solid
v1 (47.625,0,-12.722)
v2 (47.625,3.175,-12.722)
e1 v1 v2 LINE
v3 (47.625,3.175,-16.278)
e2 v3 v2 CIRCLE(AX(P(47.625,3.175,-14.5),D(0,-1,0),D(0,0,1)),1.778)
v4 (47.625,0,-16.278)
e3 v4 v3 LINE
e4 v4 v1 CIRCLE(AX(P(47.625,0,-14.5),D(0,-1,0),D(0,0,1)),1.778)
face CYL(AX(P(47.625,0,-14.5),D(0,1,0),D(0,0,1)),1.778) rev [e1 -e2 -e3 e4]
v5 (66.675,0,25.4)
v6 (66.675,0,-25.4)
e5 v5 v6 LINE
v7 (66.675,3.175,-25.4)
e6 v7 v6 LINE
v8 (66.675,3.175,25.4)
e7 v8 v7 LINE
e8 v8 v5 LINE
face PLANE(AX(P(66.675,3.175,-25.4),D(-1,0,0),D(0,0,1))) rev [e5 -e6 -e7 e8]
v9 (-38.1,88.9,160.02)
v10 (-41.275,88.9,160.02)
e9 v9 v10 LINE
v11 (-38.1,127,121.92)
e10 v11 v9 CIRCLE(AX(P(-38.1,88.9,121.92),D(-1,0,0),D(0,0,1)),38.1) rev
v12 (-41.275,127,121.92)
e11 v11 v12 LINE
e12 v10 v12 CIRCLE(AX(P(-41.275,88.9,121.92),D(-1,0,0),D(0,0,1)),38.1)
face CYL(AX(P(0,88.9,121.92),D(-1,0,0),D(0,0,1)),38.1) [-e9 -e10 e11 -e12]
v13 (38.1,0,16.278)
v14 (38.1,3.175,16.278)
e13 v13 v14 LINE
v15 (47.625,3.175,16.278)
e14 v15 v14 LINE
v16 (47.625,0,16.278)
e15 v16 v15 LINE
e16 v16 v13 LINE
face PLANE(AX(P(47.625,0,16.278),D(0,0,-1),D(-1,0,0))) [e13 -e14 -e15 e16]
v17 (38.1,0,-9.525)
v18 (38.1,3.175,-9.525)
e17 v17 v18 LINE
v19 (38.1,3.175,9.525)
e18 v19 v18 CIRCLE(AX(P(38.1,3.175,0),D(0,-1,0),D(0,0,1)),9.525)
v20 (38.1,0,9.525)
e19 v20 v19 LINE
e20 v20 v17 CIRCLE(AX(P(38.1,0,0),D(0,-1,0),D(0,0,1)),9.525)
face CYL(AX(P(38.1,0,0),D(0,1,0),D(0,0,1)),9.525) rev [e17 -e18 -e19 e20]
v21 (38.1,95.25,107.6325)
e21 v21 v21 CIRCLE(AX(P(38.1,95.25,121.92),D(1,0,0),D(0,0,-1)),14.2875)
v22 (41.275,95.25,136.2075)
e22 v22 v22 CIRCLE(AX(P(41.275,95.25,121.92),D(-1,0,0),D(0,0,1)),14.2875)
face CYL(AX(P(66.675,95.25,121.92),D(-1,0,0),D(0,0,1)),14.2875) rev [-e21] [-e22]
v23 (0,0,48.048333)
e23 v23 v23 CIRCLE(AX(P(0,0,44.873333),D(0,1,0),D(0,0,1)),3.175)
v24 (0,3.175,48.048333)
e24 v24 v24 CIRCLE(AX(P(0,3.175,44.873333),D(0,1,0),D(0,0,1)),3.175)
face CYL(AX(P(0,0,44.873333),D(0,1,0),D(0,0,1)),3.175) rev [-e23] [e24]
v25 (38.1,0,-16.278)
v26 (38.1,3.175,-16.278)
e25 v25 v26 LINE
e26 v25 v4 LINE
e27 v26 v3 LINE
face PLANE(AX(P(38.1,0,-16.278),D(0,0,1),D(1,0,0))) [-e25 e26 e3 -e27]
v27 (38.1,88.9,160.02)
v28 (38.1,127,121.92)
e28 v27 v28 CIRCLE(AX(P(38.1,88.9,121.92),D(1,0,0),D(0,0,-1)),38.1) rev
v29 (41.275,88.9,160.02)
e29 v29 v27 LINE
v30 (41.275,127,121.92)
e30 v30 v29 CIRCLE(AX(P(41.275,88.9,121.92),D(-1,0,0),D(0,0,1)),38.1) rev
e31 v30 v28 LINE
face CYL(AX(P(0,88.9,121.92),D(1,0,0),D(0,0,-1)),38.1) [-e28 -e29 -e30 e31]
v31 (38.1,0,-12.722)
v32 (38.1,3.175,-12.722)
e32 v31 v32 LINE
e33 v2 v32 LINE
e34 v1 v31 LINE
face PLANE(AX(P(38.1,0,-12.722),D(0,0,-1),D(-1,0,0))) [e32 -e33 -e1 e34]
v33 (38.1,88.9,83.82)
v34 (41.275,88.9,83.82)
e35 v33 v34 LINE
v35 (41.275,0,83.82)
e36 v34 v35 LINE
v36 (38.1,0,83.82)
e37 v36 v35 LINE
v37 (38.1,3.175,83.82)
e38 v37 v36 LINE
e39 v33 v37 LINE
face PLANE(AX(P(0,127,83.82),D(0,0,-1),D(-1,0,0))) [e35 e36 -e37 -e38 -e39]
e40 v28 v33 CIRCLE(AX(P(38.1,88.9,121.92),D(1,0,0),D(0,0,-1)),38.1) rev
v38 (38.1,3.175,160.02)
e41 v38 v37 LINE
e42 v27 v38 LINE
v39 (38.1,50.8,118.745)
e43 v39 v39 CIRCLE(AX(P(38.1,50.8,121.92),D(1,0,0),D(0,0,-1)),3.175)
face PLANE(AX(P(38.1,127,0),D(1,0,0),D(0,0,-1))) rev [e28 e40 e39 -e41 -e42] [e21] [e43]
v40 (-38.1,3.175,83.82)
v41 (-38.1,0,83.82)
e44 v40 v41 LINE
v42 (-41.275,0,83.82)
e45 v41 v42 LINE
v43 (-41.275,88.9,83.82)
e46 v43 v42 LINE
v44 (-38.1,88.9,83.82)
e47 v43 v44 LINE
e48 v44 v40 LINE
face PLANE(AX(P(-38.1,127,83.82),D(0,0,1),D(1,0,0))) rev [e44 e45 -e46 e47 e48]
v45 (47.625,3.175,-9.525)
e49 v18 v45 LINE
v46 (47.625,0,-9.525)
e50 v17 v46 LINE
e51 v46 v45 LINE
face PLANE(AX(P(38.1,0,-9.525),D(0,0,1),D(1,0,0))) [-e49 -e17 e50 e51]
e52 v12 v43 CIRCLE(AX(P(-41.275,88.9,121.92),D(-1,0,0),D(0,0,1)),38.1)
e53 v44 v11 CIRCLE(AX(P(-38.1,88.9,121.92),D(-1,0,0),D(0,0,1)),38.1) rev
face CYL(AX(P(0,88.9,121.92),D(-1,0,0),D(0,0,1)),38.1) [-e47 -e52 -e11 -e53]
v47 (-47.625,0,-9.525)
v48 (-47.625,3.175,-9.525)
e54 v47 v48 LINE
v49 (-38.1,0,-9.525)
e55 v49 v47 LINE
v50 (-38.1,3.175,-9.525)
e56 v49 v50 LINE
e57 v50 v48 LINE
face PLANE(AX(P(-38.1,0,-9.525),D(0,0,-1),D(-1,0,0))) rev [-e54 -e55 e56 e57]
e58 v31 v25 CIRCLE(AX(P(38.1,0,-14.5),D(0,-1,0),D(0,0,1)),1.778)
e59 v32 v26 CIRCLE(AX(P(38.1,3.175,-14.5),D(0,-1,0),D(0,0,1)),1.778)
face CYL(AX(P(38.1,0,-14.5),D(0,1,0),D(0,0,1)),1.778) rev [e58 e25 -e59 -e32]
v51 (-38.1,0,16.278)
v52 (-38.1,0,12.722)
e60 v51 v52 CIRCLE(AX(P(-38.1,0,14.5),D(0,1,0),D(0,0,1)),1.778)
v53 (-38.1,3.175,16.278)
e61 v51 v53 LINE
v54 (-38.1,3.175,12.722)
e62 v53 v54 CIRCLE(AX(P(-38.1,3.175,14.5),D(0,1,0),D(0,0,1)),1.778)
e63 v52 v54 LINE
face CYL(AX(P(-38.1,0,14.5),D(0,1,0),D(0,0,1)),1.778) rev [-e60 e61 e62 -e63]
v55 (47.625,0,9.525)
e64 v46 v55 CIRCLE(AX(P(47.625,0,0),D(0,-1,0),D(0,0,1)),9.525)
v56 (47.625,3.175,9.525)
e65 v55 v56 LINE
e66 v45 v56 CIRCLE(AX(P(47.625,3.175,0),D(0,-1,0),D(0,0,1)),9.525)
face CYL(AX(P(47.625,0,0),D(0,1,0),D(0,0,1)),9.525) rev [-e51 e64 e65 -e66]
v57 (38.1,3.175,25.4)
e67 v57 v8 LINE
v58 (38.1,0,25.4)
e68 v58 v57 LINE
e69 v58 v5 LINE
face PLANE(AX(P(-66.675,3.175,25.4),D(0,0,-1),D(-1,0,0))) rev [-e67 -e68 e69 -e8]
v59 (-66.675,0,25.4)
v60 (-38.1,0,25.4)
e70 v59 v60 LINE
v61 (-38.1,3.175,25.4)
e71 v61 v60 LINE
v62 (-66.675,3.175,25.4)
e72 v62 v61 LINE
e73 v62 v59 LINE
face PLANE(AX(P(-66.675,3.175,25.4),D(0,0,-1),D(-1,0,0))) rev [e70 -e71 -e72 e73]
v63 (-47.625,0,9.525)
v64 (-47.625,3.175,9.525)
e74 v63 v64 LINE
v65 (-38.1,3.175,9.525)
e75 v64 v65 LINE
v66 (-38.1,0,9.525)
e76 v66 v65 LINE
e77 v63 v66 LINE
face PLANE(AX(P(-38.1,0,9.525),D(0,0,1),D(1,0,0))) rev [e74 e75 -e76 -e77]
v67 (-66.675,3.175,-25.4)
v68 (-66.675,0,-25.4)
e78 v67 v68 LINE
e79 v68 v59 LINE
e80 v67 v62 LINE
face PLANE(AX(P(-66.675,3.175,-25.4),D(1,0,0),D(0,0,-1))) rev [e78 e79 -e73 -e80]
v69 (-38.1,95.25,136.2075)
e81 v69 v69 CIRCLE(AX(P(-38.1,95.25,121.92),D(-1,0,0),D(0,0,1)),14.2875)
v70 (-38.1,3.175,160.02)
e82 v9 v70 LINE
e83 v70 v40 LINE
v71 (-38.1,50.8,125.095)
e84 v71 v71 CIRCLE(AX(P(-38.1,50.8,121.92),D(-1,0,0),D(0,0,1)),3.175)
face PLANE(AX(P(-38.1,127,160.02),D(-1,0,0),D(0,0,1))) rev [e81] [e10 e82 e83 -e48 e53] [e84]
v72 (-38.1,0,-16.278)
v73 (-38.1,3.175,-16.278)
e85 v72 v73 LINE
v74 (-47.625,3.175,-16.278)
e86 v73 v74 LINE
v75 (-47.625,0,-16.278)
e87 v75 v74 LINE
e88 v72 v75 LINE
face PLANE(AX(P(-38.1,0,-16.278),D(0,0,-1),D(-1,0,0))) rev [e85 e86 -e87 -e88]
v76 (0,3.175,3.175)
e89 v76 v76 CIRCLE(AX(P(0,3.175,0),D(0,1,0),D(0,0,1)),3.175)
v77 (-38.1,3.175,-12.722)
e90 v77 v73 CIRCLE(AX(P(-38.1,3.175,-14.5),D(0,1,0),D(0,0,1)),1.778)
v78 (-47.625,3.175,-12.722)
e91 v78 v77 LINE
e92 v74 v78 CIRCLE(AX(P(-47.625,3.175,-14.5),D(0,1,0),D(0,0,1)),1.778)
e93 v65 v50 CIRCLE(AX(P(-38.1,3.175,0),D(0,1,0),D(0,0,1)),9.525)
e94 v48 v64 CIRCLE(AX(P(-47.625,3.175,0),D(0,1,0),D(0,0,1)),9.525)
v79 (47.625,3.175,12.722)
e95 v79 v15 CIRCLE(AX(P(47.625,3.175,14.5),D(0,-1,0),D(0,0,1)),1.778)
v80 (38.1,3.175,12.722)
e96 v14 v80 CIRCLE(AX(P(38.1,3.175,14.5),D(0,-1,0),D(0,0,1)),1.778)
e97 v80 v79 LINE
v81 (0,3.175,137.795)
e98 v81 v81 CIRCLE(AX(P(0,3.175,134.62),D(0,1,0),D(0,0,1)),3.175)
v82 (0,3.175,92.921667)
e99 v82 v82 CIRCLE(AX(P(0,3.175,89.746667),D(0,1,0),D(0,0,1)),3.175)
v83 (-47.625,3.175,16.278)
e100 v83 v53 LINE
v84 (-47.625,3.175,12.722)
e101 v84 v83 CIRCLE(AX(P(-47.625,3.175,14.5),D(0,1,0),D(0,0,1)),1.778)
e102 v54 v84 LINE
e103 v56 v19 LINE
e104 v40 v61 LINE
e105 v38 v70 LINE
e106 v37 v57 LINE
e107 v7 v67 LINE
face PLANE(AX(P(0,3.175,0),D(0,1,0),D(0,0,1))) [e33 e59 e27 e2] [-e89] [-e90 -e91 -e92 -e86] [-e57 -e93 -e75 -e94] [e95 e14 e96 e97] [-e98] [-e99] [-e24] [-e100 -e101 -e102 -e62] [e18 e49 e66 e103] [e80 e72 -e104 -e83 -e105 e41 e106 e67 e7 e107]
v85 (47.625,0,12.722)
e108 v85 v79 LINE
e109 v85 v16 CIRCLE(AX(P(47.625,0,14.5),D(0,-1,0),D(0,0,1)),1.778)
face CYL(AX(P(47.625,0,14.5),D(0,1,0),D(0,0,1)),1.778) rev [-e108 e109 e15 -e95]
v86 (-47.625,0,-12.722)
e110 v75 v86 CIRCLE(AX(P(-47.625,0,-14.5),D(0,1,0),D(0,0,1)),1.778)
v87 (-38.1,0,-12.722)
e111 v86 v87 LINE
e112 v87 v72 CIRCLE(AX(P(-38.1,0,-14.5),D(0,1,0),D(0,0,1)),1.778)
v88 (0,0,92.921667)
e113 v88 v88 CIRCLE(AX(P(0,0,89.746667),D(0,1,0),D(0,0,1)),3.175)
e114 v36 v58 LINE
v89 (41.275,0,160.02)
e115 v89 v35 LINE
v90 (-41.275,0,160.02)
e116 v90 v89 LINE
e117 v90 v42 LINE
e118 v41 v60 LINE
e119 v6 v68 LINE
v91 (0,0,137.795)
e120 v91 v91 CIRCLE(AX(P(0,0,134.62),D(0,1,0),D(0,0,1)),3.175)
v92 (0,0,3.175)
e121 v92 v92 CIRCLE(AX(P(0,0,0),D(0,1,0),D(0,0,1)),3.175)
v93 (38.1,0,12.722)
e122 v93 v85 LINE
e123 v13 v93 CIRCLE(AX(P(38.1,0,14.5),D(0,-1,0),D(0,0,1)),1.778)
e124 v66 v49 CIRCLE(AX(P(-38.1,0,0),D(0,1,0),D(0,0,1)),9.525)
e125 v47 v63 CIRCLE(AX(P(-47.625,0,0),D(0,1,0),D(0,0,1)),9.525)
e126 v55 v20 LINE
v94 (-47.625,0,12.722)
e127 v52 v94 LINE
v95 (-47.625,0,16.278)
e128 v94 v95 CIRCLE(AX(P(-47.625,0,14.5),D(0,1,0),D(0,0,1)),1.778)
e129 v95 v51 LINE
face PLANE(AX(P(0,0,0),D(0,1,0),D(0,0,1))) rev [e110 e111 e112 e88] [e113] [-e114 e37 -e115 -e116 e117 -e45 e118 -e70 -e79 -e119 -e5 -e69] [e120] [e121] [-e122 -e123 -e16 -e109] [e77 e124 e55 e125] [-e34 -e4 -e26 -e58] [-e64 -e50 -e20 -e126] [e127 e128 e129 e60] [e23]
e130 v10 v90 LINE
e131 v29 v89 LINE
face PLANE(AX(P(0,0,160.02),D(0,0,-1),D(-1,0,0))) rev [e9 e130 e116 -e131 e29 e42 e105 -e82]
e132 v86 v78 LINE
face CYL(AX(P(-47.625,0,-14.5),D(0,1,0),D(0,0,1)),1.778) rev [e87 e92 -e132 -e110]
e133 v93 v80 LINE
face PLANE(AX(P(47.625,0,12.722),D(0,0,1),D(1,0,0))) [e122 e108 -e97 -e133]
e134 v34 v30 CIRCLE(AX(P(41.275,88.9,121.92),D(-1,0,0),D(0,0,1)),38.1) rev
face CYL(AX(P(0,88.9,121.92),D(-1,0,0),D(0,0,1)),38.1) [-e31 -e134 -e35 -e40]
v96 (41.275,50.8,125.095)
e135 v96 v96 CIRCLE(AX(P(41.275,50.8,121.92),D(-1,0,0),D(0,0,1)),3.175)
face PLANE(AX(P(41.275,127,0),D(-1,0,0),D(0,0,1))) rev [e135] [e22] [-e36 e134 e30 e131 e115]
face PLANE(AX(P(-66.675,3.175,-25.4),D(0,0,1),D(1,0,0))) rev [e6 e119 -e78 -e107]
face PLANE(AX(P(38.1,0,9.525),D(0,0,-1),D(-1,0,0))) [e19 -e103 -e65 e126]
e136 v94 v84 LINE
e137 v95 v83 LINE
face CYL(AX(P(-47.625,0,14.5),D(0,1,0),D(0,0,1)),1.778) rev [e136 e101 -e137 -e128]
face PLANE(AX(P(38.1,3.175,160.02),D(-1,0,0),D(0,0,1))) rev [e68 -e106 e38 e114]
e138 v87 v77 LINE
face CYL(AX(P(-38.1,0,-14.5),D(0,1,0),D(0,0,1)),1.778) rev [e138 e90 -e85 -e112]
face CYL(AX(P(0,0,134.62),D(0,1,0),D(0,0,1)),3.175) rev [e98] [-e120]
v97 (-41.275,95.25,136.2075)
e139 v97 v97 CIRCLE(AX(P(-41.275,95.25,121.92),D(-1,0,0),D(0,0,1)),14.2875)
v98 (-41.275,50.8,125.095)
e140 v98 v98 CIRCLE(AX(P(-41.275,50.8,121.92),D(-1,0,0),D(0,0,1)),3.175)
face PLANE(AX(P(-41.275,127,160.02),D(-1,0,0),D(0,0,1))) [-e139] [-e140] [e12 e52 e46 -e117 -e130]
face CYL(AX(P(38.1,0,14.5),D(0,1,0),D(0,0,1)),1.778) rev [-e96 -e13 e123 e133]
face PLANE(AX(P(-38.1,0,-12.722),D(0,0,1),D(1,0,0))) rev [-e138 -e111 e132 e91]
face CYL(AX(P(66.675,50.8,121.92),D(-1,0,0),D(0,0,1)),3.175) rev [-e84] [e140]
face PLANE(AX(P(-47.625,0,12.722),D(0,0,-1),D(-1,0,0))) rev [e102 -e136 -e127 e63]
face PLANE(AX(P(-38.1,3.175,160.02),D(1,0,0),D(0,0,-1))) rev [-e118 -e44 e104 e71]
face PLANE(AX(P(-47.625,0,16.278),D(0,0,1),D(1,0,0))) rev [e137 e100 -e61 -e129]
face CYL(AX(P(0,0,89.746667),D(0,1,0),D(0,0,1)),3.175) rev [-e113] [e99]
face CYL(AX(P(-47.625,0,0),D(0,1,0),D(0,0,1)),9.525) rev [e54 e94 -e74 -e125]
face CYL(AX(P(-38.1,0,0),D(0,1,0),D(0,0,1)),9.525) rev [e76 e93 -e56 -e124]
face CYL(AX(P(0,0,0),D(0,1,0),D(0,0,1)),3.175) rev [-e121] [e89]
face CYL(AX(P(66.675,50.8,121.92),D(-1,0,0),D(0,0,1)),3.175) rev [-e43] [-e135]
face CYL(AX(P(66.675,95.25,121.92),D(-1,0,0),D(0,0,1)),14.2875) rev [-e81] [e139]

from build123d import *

# Parameters (mm, degrees)
SKETCH1_W           = 133.35
SKETCH1_H           = 50.8
BOSS_EXTRUDE1_DEPTH = 3.175
CUT_EXTRUDE1_DEPTH  = 3.175
SKETCH4_W           = 76.2
SKETCH4_H           = 3.175
BOSS_EXTRUDE2_DEPTH = 134.62
SKETCH5_W           = 3.175
SKETCH5_H           = 76.2
BOSS_EXTRUDE3_DEPTH = 127
FILLET1_R           = 38.1
SKETCH6_R           = 14.2875
SKETCH6_R_2         = 3.175
CUT_EXTRUDE3_DEPTH  = 232.059738812
SKETCH3_R           = 3.175
CUT_EXTRUDE2_DEPTH  = 214.036585238


with BuildPart() as part:
    # Sketch1 → Boss-Extrude1 (new body)
    with BuildSketch(Plane(origin=(0, 0, 0), x_dir=(1, 0, 0), z_dir=(0, 1, 0))):
        Rectangle(SKETCH1_W, SKETCH1_H)
    extrude(amount=BOSS_EXTRUDE1_DEPTH)

    # Sketch2 → Cut-Extrude1 (cut)
    with BuildSketch(Plane(origin=(0, 3.175, 0), x_dir=(1, 0, 0), z_dir=(0, 1, 0))):
        with BuildLine():
            Line((-47.625, -12.722), (-38.1, -12.722))
            ThreePointArc((-38.1, -12.722), (-36.322, -14.5), (-38.1, -16.278))
            Line((-38.1, -16.278), (-47.625, -16.278))
            ThreePointArc((-47.625, -16.278), (-49.403, -14.5), (-47.625, -12.722))
        make_face()
        with BuildLine():
            Line((-38.1, 12.722), (-47.625, 12.722))
            ThreePointArc((-47.625, 12.722), (-49.403, 14.5), (-47.625, 16.278))
            Line((-47.625, 16.278), (-38.1, 16.278))
            ThreePointArc((-38.1, 16.278), (-36.322, 14.5), (-38.1, 12.722))
        make_face()
        with BuildLine():
            Line((-38.1, -9.525), (-47.625, -9.525))
            ThreePointArc((-47.625, -9.525), (-57.15, 0), (-47.625, 9.525))
            Line((-47.625, 9.525), (-38.1, 9.525))
            ThreePointArc((-38.1, 9.525), (-28.575, 0), (-38.1, -9.525))
        make_face()
    cut_extrude1 = extrude(amount=-CUT_EXTRUDE1_DEPTH, mode=Mode.SUBTRACT)

    # Mirror1: Cut-Extrude1 across plane
    add(cut_extrude1.mirror(Plane(origin=(0, 0, 0), x_dir=(0, 0, 1), z_dir=(1, 0, 0))), mode=Mode.SUBTRACT)

    # Sketch4 → Boss-Extrude2 (add)
    with BuildSketch(Plane.XY.offset(25.4)):
        with Locations((0, 1.5875)):
            Rectangle(SKETCH4_W, SKETCH4_H)
    extrude(amount=BOSS_EXTRUDE2_DEPTH)

    # Sketch5 → Boss-Extrude3 (add)
    with BuildSketch(Plane.XZ):
        with Locations((39.6875, 121.92)):
            Rectangle(SKETCH5_W, SKETCH5_H)
        with Locations((-39.6875, 121.92)):
            Rectangle(SKETCH5_W, SKETCH5_H)
    extrude(amount=-BOSS_EXTRUDE3_DEPTH)

    # Fillet1
    fillet1_edges = [part.edges().sort_by_distance(p)[0] for p in [
        (39.6875, 127, 160.02),
        (-39.6875, 127, 160.02),
        (39.6875, 127, 83.82),
        (-39.6875, 127, 83.82),
    ]]
    fillet(fillet1_edges, radius=FILLET1_R - 0.0001)  # a hair under: the kernel refuses the full size

    # Sketch6 → Cut-Extrude3 (cut, through all)
    with BuildSketch(Plane.ZY.offset(41.275)):
        with Locations((121.92, 95.25)):
            Circle(SKETCH6_R)
        with Locations((121.92, 50.8)):
            Circle(SKETCH6_R_2)
    extrude(amount=-CUT_EXTRUDE3_DEPTH, mode=Mode.SUBTRACT)

    # Sketch3 → Cut-Extrude2 (cut, through all)
    with BuildSketch(Plane(origin=(0, 3.175, 0), x_dir=(1, 0, 0), z_dir=(0, 1, 0))):
        with Locations(Location((0, 0, 0), (0, 0, 270))):
            Circle(SKETCH3_R)
        with Locations(Location((0, -44.873333333, 0), (0, 0, 270))):
            Circle(SKETCH3_R)
        with Locations(Location((0, -89.746666667, 0), (0, 0, 270))):
            Circle(SKETCH3_R)
        with Locations(Location((0, -134.62, 0), (0, 0, 270))):
            Circle(SKETCH3_R)
    extrude(amount=-CUT_EXTRUDE2_DEPTH, mode=Mode.SUBTRACT)


solid = part.part
